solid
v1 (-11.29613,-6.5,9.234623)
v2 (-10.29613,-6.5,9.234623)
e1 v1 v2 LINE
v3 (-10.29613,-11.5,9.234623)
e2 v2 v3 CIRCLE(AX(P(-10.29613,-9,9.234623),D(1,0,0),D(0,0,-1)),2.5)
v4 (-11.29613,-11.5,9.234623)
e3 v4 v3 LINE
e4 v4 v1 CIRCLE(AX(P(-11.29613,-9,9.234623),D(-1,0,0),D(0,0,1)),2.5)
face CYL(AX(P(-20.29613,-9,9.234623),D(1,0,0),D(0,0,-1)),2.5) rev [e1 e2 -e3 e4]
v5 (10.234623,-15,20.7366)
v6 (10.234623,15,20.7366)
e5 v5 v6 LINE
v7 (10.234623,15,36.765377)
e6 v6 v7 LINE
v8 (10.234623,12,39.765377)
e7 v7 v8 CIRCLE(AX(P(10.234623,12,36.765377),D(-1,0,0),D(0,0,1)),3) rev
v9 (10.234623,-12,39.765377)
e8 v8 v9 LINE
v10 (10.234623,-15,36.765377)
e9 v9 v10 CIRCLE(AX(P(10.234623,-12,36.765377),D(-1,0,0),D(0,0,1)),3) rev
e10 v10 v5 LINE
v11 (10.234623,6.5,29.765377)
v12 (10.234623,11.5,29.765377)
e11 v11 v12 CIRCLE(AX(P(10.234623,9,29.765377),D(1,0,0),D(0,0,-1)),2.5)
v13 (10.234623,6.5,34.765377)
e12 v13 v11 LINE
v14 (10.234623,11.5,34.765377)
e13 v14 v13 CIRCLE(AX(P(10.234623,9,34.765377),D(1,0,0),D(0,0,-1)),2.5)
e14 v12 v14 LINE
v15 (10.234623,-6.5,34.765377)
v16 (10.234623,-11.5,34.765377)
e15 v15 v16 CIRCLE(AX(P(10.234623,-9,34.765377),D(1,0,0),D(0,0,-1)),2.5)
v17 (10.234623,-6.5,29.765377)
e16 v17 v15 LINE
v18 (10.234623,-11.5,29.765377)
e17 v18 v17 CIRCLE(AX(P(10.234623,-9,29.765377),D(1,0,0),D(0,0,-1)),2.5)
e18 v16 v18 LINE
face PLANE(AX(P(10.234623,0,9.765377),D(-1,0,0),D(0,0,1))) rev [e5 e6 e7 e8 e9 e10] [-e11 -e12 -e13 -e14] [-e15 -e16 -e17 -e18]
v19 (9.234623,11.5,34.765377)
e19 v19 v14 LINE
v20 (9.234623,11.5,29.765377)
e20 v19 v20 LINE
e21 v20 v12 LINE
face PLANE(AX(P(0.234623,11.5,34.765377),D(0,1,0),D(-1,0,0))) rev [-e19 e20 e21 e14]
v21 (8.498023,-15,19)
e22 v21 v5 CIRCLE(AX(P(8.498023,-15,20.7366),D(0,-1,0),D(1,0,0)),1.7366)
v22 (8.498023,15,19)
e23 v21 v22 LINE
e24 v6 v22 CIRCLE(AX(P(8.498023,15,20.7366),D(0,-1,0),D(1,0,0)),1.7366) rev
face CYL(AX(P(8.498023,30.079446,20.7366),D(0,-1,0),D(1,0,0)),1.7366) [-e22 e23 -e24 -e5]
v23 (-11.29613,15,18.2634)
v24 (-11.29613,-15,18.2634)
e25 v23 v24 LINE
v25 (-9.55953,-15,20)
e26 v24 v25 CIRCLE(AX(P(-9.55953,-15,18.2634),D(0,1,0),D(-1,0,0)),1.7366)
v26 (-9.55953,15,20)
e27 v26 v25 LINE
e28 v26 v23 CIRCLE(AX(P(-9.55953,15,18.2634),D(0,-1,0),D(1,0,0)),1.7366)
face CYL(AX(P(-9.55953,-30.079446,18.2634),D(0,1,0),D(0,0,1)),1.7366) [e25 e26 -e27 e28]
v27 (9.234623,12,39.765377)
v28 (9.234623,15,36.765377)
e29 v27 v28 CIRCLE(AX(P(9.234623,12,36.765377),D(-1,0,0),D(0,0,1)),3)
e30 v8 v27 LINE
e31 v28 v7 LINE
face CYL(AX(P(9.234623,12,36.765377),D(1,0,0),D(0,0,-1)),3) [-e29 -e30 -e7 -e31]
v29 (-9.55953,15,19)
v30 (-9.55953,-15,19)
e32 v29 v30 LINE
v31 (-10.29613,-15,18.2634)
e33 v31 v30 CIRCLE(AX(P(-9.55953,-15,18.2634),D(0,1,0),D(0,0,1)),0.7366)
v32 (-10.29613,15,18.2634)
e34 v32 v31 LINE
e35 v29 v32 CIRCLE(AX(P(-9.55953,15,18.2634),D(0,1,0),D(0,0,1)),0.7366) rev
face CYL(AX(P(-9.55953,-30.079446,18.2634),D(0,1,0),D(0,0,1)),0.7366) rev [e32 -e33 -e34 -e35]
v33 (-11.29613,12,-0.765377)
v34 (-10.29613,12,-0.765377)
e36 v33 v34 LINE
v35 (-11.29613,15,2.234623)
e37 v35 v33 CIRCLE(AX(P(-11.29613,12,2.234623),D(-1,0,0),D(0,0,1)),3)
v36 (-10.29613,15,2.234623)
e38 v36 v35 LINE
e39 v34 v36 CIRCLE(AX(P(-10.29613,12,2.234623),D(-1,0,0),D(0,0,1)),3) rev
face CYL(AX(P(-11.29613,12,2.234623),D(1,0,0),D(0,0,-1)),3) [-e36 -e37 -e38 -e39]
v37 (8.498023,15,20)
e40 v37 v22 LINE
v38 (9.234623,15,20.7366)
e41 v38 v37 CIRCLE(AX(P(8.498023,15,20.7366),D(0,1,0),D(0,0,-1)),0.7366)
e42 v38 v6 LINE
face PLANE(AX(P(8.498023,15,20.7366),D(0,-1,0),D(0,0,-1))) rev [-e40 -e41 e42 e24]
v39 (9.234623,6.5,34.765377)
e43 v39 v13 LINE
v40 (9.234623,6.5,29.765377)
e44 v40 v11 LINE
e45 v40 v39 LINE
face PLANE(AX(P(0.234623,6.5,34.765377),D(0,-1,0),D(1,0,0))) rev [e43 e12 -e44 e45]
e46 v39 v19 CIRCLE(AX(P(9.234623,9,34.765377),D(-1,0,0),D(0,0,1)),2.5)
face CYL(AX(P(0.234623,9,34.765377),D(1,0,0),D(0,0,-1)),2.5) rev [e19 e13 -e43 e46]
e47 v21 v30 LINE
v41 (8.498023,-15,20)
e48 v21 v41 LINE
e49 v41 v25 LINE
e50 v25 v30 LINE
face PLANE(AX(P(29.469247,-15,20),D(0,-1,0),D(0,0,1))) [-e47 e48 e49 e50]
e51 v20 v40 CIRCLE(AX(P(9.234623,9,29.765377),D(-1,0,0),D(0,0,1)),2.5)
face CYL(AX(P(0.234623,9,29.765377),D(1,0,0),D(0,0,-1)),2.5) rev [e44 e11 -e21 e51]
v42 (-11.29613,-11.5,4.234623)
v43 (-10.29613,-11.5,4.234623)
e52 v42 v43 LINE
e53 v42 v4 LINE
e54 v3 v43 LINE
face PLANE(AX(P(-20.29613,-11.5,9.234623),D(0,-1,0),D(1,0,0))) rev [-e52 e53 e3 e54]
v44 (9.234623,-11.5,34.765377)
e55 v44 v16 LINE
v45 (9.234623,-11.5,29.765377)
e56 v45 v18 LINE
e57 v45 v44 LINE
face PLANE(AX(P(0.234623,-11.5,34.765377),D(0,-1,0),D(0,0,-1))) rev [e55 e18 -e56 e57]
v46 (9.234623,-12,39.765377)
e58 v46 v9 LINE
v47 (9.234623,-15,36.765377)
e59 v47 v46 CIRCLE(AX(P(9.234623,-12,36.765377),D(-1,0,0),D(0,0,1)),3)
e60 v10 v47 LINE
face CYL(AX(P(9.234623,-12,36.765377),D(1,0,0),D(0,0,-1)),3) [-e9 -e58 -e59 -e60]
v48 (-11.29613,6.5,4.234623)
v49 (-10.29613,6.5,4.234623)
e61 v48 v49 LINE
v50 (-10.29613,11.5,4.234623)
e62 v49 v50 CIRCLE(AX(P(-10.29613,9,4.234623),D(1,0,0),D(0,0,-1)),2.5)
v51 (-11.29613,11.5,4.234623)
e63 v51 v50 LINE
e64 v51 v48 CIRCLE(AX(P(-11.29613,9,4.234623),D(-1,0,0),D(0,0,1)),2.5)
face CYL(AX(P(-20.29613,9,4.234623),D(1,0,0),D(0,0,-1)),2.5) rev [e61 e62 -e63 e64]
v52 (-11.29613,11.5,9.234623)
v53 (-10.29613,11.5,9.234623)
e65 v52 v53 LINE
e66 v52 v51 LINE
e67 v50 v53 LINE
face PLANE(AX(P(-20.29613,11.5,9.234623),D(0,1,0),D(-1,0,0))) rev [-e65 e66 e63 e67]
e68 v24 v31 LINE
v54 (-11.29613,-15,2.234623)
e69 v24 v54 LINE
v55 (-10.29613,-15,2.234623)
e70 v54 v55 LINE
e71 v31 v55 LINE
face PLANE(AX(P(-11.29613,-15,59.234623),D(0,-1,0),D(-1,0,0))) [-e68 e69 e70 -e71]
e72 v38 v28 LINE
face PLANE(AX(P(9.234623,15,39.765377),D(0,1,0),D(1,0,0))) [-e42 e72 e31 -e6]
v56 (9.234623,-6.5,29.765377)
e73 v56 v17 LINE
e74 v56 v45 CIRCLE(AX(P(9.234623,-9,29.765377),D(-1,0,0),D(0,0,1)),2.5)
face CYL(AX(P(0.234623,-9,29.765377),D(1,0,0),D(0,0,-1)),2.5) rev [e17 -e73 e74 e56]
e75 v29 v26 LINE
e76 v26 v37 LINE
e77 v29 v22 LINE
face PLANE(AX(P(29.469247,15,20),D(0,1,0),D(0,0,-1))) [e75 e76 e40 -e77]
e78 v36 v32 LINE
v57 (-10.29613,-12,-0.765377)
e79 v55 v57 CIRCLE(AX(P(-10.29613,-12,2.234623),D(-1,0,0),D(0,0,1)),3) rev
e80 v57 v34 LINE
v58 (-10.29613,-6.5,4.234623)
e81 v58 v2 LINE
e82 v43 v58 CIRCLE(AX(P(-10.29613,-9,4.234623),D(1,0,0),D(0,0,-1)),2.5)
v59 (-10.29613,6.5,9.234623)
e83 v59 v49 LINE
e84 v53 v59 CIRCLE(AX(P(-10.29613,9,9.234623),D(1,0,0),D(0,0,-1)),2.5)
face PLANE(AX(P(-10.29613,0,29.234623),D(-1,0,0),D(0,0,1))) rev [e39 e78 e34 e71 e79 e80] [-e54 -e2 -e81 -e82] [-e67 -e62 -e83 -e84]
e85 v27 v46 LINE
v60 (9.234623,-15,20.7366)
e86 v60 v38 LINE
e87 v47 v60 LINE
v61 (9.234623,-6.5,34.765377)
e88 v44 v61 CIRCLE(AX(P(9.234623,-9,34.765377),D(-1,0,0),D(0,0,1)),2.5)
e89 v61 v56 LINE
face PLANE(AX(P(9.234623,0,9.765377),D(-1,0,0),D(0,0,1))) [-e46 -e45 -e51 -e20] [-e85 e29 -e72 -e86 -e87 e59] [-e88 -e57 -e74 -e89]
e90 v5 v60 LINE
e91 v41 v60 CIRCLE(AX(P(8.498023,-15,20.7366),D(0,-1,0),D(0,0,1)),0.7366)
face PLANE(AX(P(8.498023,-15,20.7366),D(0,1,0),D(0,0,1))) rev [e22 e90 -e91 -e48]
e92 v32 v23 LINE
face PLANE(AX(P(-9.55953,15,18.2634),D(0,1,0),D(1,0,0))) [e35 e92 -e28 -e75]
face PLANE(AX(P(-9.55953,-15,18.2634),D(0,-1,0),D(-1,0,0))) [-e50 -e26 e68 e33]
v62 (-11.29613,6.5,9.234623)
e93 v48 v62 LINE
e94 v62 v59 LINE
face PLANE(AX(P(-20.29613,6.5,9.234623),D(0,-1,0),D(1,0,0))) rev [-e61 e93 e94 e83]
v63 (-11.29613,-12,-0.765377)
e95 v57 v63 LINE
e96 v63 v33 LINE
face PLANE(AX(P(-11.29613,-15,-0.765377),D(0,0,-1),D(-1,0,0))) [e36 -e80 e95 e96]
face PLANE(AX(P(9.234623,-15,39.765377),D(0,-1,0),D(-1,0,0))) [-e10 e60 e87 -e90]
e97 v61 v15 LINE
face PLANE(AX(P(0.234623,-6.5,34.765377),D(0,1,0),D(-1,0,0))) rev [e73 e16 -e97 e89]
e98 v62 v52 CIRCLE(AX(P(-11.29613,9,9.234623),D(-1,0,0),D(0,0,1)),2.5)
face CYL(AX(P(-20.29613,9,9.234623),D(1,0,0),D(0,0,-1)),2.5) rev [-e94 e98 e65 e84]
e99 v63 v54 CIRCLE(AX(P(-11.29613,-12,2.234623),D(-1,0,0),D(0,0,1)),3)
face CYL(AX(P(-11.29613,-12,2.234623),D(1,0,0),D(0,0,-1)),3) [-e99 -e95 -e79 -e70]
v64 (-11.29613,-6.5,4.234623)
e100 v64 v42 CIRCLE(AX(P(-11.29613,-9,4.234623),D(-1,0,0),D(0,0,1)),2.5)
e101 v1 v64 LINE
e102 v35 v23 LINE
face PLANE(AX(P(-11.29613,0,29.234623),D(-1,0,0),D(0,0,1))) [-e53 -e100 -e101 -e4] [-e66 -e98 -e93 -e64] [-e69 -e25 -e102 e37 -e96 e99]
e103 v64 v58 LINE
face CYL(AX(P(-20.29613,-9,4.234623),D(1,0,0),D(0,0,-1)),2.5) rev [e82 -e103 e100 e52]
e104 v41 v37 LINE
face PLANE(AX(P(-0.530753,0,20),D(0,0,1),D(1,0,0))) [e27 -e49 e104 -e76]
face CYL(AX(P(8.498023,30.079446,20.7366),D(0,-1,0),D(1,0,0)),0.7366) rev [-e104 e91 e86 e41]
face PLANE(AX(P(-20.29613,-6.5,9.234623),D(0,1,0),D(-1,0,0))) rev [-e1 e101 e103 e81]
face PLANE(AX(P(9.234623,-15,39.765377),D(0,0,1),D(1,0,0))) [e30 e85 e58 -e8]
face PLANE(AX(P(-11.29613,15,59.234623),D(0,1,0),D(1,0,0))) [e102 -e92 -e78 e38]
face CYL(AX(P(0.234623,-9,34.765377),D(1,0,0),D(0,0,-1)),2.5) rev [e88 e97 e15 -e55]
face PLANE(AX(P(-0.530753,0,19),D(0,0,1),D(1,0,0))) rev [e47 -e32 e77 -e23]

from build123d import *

# Parameters (mm, degrees)
SKETCH1_W              = 60
SKETCH1_H              = 30
BASE_FLANGE1_DEPTH     = 1
SKETCHED_START         = -15
SKETCHED_BEND1_DEPTH   = 30
SKETCHED_BEND1_2_DEPTH = 30
SKETCHED_BEND2_DEPTH   = 30
SKETCHED_BEND2_2_DEPTH = 30
CUT_EXTRUDE1_DEPTH     = 10
CUT_EXTRUDE2_DEPTH     = 10
FILLET1_R              = 3


# Read off the part's stored shape, not the designer's step: Sketched Bend1, Sketched Bend2
# Sheet-metal steps are written as plain solids
with BuildPart() as part:
    # Sketch1 → Base-Flange1 (new body)
    with BuildSketch(Plane.XY):
        Rectangle(SKETCH1_W, SKETCH1_H)
    extrude(amount=-BASE_FLANGE1_DEPTH)

    # Sketched Bend1 outline → Sketched Bend1 (cut)
    with BuildSketch(Plane(origin=(0, 0, 0), x_dir=(1, 0, 0), z_dir=(0, 1, 0)).offset(SKETCHED_START)):
        with BuildLine():
            Line((-30, 0), (9.398582279, 0))
            ThreePointArc((9.398582279, 0), (10.039397205, 0.728828115), (10.971223369, 1))
            Line((10.971223369, 1), (-30, 1))
            Line((-30, 1), (-30, 0))
        make_face()
    extrude(amount=SKETCHED_BEND1_DEPTH, mode=Mode.SUBTRACT)

    # Sketched Bend1 2 outline → Sketched Bend1 2 (add)
    with BuildSketch(Plane(origin=(0, 0, 0), x_dir=(1, 0, 0), z_dir=(0, 1, 0)).offset(SKETCHED_START)):
        with BuildLine():
            ThreePointArc((9.398582279, 0), (9.276108612, -0.359286442), (9.234623369, -0.7366))
            Line((9.234623369, -0.7366), (9.234623369, -39.765376631))
            Line((9.234623369, -39.765376631), (10.234623369, -39.765376631))
            Line((10.234623369, -39.765376631), (10.234623369, -0.7366))
            ThreePointArc((10.234623369, -0.7366), (10.450368514, -0.215745145), (10.971223369, 0))
            Line((10.971223369, 0), (9.398582279, 0))
        make_face()
    extrude(amount=SKETCHED_BEND1_2_DEPTH)

    # Sketched Bend2 outline → Sketched Bend2 (cut)
    with BuildSketch(Plane(origin=(0, 0, 0), x_dir=(1, 0, 0), z_dir=(0, 1, 0)).offset(SKETCHED_START)):
        with BuildLine():
            Line((9.234623369, -0.7366), (9.234623369, -19.16395891))
            ThreePointArc((9.234623369, -19.16395891), (9.963451484, -19.804773836), (10.234623369, -20.7366))
            Line((10.234623369, -20.7366), (10.234623369, -0.7366))
            ThreePointArc((10.234623369, -0.7366), (10.450368514, -0.215745145), (10.971223369, 0))
            Line((10.971223369, 0), (30, 0))
            Line((30, 0), (30, 1))
            Line((30, 1), (10.971223369, 1))
            ThreePointArc((10.971223369, 1), (9.743261733, 0.491361636), (9.234623369, -0.7366))
        make_face()
    extrude(amount=SKETCHED_BEND2_DEPTH, mode=Mode.SUBTRACT)

    # Sketched Bend2 2 outline → Sketched Bend2 2 (add)
    with BuildSketch(Plane(origin=(0, 0, 0), x_dir=(1, 0, 0), z_dir=(0, 1, 0)).offset(SKETCHED_START)):
        with BuildLine():
            ThreePointArc((-11.296129893, -18.2634), (-10.78749153, -19.491361636), (-9.559529893, -20))
            Line((-9.559529893, -20), (8.498023369, -20))
            ThreePointArc((8.498023369, -20), (9.018878224, -20.215745145), (9.234623369, -20.7366))
            Line((9.234623369, -20.7366), (9.234623369, -19.16395891))
            ThreePointArc((9.234623369, -19.16395891), (8.875336927, -19.041485243), (8.498023369, -19))
            Line((8.498023369, -19), (-9.559529893, -19))
            ThreePointArc((-9.559529893, -19), (-10.080384748, -18.784254855), (-10.296129893, -18.2634))
            Line((-10.296129893, -18.2634), (-10.296129893, 0.765376631))
            Line((-10.296129893, 0.765376631), (-11.296129893, 0.765376631))
            Line((-11.296129893, 0.765376631), (-11.296129893, -18.2634))
        make_face()
    extrude(amount=SKETCHED_BEND2_2_DEPTH)

    # Sketch8 → Cut-Extrude1 (cut)
    with BuildSketch(Plane(origin=(10.234623369, 0, 0), x_dir=(0, 0, -1), z_dir=(1, 0, 0))):
        with BuildLine():
            Line((-34.765376631, 11.5), (-29.765376631, 11.5))
            ThreePointArc((-29.765376631, 11.5), (-27.265376631, 9), (-29.765376631, 6.5))
            Line((-29.765376631, 6.5), (-34.765376631, 6.5))
            ThreePointArc((-34.765376631, 6.5), (-37.265376631, 9), (-34.765376631, 11.5))
        make_face()
        with BuildLine():
            Line((-34.765376631, -6.5), (-29.765376631, -6.5))
            ThreePointArc((-29.765376631, -6.5), (-27.265376631, -9), (-29.765376631, -11.5))
            Line((-29.765376631, -11.5), (-34.765376631, -11.5))
            ThreePointArc((-34.765376631, -11.5), (-37.265376631, -9), (-34.765376631, -6.5))
        make_face()
    extrude(amount=-CUT_EXTRUDE1_DEPTH, mode=Mode.SUBTRACT)

    # Sketch9 → Cut-Extrude2 (cut)
    with BuildSketch(Plane(origin=(-10.296129893, 0, 0), x_dir=(0, 0, -1), z_dir=(1, 0, 0))):
        with BuildLine():
            Line((-9.234623369, 11.5), (-4.234623369, 11.5))
            ThreePointArc((-4.234623369, 11.5), (-1.734623369, 9), (-4.234623369, 6.5))
            Line((-4.234623369, 6.5), (-9.234623369, 6.5))
            ThreePointArc((-9.234623369, 6.5), (-11.734623369, 9), (-9.234623369, 11.5))
        make_face()
        with BuildLine():
            Line((-9.234623369, -6.5), (-4.234623369, -6.5))
            ThreePointArc((-4.234623369, -6.5), (-1.734623369, -9), (-4.234623369, -11.5))
            Line((-4.234623369, -11.5), (-9.234623369, -11.5))
            ThreePointArc((-9.234623369, -11.5), (-11.734623369, -9), (-9.234623369, -6.5))
        make_face()
    extrude(amount=-CUT_EXTRUDE2_DEPTH, mode=Mode.SUBTRACT)

    # Fillet1
    fillet1_edges = [part.edges().sort_by_distance(p)[0] for p in [
        (-10.796129893, 15, -0.765376631),
        (-10.796129893, -15, -0.765376631),
        (9.734623369, -15, 39.765376631),
        (9.734623369, 15, 39.765376631),
    ]]
    fillet(fillet1_edges, radius=FILLET1_R)


solid = part.part
